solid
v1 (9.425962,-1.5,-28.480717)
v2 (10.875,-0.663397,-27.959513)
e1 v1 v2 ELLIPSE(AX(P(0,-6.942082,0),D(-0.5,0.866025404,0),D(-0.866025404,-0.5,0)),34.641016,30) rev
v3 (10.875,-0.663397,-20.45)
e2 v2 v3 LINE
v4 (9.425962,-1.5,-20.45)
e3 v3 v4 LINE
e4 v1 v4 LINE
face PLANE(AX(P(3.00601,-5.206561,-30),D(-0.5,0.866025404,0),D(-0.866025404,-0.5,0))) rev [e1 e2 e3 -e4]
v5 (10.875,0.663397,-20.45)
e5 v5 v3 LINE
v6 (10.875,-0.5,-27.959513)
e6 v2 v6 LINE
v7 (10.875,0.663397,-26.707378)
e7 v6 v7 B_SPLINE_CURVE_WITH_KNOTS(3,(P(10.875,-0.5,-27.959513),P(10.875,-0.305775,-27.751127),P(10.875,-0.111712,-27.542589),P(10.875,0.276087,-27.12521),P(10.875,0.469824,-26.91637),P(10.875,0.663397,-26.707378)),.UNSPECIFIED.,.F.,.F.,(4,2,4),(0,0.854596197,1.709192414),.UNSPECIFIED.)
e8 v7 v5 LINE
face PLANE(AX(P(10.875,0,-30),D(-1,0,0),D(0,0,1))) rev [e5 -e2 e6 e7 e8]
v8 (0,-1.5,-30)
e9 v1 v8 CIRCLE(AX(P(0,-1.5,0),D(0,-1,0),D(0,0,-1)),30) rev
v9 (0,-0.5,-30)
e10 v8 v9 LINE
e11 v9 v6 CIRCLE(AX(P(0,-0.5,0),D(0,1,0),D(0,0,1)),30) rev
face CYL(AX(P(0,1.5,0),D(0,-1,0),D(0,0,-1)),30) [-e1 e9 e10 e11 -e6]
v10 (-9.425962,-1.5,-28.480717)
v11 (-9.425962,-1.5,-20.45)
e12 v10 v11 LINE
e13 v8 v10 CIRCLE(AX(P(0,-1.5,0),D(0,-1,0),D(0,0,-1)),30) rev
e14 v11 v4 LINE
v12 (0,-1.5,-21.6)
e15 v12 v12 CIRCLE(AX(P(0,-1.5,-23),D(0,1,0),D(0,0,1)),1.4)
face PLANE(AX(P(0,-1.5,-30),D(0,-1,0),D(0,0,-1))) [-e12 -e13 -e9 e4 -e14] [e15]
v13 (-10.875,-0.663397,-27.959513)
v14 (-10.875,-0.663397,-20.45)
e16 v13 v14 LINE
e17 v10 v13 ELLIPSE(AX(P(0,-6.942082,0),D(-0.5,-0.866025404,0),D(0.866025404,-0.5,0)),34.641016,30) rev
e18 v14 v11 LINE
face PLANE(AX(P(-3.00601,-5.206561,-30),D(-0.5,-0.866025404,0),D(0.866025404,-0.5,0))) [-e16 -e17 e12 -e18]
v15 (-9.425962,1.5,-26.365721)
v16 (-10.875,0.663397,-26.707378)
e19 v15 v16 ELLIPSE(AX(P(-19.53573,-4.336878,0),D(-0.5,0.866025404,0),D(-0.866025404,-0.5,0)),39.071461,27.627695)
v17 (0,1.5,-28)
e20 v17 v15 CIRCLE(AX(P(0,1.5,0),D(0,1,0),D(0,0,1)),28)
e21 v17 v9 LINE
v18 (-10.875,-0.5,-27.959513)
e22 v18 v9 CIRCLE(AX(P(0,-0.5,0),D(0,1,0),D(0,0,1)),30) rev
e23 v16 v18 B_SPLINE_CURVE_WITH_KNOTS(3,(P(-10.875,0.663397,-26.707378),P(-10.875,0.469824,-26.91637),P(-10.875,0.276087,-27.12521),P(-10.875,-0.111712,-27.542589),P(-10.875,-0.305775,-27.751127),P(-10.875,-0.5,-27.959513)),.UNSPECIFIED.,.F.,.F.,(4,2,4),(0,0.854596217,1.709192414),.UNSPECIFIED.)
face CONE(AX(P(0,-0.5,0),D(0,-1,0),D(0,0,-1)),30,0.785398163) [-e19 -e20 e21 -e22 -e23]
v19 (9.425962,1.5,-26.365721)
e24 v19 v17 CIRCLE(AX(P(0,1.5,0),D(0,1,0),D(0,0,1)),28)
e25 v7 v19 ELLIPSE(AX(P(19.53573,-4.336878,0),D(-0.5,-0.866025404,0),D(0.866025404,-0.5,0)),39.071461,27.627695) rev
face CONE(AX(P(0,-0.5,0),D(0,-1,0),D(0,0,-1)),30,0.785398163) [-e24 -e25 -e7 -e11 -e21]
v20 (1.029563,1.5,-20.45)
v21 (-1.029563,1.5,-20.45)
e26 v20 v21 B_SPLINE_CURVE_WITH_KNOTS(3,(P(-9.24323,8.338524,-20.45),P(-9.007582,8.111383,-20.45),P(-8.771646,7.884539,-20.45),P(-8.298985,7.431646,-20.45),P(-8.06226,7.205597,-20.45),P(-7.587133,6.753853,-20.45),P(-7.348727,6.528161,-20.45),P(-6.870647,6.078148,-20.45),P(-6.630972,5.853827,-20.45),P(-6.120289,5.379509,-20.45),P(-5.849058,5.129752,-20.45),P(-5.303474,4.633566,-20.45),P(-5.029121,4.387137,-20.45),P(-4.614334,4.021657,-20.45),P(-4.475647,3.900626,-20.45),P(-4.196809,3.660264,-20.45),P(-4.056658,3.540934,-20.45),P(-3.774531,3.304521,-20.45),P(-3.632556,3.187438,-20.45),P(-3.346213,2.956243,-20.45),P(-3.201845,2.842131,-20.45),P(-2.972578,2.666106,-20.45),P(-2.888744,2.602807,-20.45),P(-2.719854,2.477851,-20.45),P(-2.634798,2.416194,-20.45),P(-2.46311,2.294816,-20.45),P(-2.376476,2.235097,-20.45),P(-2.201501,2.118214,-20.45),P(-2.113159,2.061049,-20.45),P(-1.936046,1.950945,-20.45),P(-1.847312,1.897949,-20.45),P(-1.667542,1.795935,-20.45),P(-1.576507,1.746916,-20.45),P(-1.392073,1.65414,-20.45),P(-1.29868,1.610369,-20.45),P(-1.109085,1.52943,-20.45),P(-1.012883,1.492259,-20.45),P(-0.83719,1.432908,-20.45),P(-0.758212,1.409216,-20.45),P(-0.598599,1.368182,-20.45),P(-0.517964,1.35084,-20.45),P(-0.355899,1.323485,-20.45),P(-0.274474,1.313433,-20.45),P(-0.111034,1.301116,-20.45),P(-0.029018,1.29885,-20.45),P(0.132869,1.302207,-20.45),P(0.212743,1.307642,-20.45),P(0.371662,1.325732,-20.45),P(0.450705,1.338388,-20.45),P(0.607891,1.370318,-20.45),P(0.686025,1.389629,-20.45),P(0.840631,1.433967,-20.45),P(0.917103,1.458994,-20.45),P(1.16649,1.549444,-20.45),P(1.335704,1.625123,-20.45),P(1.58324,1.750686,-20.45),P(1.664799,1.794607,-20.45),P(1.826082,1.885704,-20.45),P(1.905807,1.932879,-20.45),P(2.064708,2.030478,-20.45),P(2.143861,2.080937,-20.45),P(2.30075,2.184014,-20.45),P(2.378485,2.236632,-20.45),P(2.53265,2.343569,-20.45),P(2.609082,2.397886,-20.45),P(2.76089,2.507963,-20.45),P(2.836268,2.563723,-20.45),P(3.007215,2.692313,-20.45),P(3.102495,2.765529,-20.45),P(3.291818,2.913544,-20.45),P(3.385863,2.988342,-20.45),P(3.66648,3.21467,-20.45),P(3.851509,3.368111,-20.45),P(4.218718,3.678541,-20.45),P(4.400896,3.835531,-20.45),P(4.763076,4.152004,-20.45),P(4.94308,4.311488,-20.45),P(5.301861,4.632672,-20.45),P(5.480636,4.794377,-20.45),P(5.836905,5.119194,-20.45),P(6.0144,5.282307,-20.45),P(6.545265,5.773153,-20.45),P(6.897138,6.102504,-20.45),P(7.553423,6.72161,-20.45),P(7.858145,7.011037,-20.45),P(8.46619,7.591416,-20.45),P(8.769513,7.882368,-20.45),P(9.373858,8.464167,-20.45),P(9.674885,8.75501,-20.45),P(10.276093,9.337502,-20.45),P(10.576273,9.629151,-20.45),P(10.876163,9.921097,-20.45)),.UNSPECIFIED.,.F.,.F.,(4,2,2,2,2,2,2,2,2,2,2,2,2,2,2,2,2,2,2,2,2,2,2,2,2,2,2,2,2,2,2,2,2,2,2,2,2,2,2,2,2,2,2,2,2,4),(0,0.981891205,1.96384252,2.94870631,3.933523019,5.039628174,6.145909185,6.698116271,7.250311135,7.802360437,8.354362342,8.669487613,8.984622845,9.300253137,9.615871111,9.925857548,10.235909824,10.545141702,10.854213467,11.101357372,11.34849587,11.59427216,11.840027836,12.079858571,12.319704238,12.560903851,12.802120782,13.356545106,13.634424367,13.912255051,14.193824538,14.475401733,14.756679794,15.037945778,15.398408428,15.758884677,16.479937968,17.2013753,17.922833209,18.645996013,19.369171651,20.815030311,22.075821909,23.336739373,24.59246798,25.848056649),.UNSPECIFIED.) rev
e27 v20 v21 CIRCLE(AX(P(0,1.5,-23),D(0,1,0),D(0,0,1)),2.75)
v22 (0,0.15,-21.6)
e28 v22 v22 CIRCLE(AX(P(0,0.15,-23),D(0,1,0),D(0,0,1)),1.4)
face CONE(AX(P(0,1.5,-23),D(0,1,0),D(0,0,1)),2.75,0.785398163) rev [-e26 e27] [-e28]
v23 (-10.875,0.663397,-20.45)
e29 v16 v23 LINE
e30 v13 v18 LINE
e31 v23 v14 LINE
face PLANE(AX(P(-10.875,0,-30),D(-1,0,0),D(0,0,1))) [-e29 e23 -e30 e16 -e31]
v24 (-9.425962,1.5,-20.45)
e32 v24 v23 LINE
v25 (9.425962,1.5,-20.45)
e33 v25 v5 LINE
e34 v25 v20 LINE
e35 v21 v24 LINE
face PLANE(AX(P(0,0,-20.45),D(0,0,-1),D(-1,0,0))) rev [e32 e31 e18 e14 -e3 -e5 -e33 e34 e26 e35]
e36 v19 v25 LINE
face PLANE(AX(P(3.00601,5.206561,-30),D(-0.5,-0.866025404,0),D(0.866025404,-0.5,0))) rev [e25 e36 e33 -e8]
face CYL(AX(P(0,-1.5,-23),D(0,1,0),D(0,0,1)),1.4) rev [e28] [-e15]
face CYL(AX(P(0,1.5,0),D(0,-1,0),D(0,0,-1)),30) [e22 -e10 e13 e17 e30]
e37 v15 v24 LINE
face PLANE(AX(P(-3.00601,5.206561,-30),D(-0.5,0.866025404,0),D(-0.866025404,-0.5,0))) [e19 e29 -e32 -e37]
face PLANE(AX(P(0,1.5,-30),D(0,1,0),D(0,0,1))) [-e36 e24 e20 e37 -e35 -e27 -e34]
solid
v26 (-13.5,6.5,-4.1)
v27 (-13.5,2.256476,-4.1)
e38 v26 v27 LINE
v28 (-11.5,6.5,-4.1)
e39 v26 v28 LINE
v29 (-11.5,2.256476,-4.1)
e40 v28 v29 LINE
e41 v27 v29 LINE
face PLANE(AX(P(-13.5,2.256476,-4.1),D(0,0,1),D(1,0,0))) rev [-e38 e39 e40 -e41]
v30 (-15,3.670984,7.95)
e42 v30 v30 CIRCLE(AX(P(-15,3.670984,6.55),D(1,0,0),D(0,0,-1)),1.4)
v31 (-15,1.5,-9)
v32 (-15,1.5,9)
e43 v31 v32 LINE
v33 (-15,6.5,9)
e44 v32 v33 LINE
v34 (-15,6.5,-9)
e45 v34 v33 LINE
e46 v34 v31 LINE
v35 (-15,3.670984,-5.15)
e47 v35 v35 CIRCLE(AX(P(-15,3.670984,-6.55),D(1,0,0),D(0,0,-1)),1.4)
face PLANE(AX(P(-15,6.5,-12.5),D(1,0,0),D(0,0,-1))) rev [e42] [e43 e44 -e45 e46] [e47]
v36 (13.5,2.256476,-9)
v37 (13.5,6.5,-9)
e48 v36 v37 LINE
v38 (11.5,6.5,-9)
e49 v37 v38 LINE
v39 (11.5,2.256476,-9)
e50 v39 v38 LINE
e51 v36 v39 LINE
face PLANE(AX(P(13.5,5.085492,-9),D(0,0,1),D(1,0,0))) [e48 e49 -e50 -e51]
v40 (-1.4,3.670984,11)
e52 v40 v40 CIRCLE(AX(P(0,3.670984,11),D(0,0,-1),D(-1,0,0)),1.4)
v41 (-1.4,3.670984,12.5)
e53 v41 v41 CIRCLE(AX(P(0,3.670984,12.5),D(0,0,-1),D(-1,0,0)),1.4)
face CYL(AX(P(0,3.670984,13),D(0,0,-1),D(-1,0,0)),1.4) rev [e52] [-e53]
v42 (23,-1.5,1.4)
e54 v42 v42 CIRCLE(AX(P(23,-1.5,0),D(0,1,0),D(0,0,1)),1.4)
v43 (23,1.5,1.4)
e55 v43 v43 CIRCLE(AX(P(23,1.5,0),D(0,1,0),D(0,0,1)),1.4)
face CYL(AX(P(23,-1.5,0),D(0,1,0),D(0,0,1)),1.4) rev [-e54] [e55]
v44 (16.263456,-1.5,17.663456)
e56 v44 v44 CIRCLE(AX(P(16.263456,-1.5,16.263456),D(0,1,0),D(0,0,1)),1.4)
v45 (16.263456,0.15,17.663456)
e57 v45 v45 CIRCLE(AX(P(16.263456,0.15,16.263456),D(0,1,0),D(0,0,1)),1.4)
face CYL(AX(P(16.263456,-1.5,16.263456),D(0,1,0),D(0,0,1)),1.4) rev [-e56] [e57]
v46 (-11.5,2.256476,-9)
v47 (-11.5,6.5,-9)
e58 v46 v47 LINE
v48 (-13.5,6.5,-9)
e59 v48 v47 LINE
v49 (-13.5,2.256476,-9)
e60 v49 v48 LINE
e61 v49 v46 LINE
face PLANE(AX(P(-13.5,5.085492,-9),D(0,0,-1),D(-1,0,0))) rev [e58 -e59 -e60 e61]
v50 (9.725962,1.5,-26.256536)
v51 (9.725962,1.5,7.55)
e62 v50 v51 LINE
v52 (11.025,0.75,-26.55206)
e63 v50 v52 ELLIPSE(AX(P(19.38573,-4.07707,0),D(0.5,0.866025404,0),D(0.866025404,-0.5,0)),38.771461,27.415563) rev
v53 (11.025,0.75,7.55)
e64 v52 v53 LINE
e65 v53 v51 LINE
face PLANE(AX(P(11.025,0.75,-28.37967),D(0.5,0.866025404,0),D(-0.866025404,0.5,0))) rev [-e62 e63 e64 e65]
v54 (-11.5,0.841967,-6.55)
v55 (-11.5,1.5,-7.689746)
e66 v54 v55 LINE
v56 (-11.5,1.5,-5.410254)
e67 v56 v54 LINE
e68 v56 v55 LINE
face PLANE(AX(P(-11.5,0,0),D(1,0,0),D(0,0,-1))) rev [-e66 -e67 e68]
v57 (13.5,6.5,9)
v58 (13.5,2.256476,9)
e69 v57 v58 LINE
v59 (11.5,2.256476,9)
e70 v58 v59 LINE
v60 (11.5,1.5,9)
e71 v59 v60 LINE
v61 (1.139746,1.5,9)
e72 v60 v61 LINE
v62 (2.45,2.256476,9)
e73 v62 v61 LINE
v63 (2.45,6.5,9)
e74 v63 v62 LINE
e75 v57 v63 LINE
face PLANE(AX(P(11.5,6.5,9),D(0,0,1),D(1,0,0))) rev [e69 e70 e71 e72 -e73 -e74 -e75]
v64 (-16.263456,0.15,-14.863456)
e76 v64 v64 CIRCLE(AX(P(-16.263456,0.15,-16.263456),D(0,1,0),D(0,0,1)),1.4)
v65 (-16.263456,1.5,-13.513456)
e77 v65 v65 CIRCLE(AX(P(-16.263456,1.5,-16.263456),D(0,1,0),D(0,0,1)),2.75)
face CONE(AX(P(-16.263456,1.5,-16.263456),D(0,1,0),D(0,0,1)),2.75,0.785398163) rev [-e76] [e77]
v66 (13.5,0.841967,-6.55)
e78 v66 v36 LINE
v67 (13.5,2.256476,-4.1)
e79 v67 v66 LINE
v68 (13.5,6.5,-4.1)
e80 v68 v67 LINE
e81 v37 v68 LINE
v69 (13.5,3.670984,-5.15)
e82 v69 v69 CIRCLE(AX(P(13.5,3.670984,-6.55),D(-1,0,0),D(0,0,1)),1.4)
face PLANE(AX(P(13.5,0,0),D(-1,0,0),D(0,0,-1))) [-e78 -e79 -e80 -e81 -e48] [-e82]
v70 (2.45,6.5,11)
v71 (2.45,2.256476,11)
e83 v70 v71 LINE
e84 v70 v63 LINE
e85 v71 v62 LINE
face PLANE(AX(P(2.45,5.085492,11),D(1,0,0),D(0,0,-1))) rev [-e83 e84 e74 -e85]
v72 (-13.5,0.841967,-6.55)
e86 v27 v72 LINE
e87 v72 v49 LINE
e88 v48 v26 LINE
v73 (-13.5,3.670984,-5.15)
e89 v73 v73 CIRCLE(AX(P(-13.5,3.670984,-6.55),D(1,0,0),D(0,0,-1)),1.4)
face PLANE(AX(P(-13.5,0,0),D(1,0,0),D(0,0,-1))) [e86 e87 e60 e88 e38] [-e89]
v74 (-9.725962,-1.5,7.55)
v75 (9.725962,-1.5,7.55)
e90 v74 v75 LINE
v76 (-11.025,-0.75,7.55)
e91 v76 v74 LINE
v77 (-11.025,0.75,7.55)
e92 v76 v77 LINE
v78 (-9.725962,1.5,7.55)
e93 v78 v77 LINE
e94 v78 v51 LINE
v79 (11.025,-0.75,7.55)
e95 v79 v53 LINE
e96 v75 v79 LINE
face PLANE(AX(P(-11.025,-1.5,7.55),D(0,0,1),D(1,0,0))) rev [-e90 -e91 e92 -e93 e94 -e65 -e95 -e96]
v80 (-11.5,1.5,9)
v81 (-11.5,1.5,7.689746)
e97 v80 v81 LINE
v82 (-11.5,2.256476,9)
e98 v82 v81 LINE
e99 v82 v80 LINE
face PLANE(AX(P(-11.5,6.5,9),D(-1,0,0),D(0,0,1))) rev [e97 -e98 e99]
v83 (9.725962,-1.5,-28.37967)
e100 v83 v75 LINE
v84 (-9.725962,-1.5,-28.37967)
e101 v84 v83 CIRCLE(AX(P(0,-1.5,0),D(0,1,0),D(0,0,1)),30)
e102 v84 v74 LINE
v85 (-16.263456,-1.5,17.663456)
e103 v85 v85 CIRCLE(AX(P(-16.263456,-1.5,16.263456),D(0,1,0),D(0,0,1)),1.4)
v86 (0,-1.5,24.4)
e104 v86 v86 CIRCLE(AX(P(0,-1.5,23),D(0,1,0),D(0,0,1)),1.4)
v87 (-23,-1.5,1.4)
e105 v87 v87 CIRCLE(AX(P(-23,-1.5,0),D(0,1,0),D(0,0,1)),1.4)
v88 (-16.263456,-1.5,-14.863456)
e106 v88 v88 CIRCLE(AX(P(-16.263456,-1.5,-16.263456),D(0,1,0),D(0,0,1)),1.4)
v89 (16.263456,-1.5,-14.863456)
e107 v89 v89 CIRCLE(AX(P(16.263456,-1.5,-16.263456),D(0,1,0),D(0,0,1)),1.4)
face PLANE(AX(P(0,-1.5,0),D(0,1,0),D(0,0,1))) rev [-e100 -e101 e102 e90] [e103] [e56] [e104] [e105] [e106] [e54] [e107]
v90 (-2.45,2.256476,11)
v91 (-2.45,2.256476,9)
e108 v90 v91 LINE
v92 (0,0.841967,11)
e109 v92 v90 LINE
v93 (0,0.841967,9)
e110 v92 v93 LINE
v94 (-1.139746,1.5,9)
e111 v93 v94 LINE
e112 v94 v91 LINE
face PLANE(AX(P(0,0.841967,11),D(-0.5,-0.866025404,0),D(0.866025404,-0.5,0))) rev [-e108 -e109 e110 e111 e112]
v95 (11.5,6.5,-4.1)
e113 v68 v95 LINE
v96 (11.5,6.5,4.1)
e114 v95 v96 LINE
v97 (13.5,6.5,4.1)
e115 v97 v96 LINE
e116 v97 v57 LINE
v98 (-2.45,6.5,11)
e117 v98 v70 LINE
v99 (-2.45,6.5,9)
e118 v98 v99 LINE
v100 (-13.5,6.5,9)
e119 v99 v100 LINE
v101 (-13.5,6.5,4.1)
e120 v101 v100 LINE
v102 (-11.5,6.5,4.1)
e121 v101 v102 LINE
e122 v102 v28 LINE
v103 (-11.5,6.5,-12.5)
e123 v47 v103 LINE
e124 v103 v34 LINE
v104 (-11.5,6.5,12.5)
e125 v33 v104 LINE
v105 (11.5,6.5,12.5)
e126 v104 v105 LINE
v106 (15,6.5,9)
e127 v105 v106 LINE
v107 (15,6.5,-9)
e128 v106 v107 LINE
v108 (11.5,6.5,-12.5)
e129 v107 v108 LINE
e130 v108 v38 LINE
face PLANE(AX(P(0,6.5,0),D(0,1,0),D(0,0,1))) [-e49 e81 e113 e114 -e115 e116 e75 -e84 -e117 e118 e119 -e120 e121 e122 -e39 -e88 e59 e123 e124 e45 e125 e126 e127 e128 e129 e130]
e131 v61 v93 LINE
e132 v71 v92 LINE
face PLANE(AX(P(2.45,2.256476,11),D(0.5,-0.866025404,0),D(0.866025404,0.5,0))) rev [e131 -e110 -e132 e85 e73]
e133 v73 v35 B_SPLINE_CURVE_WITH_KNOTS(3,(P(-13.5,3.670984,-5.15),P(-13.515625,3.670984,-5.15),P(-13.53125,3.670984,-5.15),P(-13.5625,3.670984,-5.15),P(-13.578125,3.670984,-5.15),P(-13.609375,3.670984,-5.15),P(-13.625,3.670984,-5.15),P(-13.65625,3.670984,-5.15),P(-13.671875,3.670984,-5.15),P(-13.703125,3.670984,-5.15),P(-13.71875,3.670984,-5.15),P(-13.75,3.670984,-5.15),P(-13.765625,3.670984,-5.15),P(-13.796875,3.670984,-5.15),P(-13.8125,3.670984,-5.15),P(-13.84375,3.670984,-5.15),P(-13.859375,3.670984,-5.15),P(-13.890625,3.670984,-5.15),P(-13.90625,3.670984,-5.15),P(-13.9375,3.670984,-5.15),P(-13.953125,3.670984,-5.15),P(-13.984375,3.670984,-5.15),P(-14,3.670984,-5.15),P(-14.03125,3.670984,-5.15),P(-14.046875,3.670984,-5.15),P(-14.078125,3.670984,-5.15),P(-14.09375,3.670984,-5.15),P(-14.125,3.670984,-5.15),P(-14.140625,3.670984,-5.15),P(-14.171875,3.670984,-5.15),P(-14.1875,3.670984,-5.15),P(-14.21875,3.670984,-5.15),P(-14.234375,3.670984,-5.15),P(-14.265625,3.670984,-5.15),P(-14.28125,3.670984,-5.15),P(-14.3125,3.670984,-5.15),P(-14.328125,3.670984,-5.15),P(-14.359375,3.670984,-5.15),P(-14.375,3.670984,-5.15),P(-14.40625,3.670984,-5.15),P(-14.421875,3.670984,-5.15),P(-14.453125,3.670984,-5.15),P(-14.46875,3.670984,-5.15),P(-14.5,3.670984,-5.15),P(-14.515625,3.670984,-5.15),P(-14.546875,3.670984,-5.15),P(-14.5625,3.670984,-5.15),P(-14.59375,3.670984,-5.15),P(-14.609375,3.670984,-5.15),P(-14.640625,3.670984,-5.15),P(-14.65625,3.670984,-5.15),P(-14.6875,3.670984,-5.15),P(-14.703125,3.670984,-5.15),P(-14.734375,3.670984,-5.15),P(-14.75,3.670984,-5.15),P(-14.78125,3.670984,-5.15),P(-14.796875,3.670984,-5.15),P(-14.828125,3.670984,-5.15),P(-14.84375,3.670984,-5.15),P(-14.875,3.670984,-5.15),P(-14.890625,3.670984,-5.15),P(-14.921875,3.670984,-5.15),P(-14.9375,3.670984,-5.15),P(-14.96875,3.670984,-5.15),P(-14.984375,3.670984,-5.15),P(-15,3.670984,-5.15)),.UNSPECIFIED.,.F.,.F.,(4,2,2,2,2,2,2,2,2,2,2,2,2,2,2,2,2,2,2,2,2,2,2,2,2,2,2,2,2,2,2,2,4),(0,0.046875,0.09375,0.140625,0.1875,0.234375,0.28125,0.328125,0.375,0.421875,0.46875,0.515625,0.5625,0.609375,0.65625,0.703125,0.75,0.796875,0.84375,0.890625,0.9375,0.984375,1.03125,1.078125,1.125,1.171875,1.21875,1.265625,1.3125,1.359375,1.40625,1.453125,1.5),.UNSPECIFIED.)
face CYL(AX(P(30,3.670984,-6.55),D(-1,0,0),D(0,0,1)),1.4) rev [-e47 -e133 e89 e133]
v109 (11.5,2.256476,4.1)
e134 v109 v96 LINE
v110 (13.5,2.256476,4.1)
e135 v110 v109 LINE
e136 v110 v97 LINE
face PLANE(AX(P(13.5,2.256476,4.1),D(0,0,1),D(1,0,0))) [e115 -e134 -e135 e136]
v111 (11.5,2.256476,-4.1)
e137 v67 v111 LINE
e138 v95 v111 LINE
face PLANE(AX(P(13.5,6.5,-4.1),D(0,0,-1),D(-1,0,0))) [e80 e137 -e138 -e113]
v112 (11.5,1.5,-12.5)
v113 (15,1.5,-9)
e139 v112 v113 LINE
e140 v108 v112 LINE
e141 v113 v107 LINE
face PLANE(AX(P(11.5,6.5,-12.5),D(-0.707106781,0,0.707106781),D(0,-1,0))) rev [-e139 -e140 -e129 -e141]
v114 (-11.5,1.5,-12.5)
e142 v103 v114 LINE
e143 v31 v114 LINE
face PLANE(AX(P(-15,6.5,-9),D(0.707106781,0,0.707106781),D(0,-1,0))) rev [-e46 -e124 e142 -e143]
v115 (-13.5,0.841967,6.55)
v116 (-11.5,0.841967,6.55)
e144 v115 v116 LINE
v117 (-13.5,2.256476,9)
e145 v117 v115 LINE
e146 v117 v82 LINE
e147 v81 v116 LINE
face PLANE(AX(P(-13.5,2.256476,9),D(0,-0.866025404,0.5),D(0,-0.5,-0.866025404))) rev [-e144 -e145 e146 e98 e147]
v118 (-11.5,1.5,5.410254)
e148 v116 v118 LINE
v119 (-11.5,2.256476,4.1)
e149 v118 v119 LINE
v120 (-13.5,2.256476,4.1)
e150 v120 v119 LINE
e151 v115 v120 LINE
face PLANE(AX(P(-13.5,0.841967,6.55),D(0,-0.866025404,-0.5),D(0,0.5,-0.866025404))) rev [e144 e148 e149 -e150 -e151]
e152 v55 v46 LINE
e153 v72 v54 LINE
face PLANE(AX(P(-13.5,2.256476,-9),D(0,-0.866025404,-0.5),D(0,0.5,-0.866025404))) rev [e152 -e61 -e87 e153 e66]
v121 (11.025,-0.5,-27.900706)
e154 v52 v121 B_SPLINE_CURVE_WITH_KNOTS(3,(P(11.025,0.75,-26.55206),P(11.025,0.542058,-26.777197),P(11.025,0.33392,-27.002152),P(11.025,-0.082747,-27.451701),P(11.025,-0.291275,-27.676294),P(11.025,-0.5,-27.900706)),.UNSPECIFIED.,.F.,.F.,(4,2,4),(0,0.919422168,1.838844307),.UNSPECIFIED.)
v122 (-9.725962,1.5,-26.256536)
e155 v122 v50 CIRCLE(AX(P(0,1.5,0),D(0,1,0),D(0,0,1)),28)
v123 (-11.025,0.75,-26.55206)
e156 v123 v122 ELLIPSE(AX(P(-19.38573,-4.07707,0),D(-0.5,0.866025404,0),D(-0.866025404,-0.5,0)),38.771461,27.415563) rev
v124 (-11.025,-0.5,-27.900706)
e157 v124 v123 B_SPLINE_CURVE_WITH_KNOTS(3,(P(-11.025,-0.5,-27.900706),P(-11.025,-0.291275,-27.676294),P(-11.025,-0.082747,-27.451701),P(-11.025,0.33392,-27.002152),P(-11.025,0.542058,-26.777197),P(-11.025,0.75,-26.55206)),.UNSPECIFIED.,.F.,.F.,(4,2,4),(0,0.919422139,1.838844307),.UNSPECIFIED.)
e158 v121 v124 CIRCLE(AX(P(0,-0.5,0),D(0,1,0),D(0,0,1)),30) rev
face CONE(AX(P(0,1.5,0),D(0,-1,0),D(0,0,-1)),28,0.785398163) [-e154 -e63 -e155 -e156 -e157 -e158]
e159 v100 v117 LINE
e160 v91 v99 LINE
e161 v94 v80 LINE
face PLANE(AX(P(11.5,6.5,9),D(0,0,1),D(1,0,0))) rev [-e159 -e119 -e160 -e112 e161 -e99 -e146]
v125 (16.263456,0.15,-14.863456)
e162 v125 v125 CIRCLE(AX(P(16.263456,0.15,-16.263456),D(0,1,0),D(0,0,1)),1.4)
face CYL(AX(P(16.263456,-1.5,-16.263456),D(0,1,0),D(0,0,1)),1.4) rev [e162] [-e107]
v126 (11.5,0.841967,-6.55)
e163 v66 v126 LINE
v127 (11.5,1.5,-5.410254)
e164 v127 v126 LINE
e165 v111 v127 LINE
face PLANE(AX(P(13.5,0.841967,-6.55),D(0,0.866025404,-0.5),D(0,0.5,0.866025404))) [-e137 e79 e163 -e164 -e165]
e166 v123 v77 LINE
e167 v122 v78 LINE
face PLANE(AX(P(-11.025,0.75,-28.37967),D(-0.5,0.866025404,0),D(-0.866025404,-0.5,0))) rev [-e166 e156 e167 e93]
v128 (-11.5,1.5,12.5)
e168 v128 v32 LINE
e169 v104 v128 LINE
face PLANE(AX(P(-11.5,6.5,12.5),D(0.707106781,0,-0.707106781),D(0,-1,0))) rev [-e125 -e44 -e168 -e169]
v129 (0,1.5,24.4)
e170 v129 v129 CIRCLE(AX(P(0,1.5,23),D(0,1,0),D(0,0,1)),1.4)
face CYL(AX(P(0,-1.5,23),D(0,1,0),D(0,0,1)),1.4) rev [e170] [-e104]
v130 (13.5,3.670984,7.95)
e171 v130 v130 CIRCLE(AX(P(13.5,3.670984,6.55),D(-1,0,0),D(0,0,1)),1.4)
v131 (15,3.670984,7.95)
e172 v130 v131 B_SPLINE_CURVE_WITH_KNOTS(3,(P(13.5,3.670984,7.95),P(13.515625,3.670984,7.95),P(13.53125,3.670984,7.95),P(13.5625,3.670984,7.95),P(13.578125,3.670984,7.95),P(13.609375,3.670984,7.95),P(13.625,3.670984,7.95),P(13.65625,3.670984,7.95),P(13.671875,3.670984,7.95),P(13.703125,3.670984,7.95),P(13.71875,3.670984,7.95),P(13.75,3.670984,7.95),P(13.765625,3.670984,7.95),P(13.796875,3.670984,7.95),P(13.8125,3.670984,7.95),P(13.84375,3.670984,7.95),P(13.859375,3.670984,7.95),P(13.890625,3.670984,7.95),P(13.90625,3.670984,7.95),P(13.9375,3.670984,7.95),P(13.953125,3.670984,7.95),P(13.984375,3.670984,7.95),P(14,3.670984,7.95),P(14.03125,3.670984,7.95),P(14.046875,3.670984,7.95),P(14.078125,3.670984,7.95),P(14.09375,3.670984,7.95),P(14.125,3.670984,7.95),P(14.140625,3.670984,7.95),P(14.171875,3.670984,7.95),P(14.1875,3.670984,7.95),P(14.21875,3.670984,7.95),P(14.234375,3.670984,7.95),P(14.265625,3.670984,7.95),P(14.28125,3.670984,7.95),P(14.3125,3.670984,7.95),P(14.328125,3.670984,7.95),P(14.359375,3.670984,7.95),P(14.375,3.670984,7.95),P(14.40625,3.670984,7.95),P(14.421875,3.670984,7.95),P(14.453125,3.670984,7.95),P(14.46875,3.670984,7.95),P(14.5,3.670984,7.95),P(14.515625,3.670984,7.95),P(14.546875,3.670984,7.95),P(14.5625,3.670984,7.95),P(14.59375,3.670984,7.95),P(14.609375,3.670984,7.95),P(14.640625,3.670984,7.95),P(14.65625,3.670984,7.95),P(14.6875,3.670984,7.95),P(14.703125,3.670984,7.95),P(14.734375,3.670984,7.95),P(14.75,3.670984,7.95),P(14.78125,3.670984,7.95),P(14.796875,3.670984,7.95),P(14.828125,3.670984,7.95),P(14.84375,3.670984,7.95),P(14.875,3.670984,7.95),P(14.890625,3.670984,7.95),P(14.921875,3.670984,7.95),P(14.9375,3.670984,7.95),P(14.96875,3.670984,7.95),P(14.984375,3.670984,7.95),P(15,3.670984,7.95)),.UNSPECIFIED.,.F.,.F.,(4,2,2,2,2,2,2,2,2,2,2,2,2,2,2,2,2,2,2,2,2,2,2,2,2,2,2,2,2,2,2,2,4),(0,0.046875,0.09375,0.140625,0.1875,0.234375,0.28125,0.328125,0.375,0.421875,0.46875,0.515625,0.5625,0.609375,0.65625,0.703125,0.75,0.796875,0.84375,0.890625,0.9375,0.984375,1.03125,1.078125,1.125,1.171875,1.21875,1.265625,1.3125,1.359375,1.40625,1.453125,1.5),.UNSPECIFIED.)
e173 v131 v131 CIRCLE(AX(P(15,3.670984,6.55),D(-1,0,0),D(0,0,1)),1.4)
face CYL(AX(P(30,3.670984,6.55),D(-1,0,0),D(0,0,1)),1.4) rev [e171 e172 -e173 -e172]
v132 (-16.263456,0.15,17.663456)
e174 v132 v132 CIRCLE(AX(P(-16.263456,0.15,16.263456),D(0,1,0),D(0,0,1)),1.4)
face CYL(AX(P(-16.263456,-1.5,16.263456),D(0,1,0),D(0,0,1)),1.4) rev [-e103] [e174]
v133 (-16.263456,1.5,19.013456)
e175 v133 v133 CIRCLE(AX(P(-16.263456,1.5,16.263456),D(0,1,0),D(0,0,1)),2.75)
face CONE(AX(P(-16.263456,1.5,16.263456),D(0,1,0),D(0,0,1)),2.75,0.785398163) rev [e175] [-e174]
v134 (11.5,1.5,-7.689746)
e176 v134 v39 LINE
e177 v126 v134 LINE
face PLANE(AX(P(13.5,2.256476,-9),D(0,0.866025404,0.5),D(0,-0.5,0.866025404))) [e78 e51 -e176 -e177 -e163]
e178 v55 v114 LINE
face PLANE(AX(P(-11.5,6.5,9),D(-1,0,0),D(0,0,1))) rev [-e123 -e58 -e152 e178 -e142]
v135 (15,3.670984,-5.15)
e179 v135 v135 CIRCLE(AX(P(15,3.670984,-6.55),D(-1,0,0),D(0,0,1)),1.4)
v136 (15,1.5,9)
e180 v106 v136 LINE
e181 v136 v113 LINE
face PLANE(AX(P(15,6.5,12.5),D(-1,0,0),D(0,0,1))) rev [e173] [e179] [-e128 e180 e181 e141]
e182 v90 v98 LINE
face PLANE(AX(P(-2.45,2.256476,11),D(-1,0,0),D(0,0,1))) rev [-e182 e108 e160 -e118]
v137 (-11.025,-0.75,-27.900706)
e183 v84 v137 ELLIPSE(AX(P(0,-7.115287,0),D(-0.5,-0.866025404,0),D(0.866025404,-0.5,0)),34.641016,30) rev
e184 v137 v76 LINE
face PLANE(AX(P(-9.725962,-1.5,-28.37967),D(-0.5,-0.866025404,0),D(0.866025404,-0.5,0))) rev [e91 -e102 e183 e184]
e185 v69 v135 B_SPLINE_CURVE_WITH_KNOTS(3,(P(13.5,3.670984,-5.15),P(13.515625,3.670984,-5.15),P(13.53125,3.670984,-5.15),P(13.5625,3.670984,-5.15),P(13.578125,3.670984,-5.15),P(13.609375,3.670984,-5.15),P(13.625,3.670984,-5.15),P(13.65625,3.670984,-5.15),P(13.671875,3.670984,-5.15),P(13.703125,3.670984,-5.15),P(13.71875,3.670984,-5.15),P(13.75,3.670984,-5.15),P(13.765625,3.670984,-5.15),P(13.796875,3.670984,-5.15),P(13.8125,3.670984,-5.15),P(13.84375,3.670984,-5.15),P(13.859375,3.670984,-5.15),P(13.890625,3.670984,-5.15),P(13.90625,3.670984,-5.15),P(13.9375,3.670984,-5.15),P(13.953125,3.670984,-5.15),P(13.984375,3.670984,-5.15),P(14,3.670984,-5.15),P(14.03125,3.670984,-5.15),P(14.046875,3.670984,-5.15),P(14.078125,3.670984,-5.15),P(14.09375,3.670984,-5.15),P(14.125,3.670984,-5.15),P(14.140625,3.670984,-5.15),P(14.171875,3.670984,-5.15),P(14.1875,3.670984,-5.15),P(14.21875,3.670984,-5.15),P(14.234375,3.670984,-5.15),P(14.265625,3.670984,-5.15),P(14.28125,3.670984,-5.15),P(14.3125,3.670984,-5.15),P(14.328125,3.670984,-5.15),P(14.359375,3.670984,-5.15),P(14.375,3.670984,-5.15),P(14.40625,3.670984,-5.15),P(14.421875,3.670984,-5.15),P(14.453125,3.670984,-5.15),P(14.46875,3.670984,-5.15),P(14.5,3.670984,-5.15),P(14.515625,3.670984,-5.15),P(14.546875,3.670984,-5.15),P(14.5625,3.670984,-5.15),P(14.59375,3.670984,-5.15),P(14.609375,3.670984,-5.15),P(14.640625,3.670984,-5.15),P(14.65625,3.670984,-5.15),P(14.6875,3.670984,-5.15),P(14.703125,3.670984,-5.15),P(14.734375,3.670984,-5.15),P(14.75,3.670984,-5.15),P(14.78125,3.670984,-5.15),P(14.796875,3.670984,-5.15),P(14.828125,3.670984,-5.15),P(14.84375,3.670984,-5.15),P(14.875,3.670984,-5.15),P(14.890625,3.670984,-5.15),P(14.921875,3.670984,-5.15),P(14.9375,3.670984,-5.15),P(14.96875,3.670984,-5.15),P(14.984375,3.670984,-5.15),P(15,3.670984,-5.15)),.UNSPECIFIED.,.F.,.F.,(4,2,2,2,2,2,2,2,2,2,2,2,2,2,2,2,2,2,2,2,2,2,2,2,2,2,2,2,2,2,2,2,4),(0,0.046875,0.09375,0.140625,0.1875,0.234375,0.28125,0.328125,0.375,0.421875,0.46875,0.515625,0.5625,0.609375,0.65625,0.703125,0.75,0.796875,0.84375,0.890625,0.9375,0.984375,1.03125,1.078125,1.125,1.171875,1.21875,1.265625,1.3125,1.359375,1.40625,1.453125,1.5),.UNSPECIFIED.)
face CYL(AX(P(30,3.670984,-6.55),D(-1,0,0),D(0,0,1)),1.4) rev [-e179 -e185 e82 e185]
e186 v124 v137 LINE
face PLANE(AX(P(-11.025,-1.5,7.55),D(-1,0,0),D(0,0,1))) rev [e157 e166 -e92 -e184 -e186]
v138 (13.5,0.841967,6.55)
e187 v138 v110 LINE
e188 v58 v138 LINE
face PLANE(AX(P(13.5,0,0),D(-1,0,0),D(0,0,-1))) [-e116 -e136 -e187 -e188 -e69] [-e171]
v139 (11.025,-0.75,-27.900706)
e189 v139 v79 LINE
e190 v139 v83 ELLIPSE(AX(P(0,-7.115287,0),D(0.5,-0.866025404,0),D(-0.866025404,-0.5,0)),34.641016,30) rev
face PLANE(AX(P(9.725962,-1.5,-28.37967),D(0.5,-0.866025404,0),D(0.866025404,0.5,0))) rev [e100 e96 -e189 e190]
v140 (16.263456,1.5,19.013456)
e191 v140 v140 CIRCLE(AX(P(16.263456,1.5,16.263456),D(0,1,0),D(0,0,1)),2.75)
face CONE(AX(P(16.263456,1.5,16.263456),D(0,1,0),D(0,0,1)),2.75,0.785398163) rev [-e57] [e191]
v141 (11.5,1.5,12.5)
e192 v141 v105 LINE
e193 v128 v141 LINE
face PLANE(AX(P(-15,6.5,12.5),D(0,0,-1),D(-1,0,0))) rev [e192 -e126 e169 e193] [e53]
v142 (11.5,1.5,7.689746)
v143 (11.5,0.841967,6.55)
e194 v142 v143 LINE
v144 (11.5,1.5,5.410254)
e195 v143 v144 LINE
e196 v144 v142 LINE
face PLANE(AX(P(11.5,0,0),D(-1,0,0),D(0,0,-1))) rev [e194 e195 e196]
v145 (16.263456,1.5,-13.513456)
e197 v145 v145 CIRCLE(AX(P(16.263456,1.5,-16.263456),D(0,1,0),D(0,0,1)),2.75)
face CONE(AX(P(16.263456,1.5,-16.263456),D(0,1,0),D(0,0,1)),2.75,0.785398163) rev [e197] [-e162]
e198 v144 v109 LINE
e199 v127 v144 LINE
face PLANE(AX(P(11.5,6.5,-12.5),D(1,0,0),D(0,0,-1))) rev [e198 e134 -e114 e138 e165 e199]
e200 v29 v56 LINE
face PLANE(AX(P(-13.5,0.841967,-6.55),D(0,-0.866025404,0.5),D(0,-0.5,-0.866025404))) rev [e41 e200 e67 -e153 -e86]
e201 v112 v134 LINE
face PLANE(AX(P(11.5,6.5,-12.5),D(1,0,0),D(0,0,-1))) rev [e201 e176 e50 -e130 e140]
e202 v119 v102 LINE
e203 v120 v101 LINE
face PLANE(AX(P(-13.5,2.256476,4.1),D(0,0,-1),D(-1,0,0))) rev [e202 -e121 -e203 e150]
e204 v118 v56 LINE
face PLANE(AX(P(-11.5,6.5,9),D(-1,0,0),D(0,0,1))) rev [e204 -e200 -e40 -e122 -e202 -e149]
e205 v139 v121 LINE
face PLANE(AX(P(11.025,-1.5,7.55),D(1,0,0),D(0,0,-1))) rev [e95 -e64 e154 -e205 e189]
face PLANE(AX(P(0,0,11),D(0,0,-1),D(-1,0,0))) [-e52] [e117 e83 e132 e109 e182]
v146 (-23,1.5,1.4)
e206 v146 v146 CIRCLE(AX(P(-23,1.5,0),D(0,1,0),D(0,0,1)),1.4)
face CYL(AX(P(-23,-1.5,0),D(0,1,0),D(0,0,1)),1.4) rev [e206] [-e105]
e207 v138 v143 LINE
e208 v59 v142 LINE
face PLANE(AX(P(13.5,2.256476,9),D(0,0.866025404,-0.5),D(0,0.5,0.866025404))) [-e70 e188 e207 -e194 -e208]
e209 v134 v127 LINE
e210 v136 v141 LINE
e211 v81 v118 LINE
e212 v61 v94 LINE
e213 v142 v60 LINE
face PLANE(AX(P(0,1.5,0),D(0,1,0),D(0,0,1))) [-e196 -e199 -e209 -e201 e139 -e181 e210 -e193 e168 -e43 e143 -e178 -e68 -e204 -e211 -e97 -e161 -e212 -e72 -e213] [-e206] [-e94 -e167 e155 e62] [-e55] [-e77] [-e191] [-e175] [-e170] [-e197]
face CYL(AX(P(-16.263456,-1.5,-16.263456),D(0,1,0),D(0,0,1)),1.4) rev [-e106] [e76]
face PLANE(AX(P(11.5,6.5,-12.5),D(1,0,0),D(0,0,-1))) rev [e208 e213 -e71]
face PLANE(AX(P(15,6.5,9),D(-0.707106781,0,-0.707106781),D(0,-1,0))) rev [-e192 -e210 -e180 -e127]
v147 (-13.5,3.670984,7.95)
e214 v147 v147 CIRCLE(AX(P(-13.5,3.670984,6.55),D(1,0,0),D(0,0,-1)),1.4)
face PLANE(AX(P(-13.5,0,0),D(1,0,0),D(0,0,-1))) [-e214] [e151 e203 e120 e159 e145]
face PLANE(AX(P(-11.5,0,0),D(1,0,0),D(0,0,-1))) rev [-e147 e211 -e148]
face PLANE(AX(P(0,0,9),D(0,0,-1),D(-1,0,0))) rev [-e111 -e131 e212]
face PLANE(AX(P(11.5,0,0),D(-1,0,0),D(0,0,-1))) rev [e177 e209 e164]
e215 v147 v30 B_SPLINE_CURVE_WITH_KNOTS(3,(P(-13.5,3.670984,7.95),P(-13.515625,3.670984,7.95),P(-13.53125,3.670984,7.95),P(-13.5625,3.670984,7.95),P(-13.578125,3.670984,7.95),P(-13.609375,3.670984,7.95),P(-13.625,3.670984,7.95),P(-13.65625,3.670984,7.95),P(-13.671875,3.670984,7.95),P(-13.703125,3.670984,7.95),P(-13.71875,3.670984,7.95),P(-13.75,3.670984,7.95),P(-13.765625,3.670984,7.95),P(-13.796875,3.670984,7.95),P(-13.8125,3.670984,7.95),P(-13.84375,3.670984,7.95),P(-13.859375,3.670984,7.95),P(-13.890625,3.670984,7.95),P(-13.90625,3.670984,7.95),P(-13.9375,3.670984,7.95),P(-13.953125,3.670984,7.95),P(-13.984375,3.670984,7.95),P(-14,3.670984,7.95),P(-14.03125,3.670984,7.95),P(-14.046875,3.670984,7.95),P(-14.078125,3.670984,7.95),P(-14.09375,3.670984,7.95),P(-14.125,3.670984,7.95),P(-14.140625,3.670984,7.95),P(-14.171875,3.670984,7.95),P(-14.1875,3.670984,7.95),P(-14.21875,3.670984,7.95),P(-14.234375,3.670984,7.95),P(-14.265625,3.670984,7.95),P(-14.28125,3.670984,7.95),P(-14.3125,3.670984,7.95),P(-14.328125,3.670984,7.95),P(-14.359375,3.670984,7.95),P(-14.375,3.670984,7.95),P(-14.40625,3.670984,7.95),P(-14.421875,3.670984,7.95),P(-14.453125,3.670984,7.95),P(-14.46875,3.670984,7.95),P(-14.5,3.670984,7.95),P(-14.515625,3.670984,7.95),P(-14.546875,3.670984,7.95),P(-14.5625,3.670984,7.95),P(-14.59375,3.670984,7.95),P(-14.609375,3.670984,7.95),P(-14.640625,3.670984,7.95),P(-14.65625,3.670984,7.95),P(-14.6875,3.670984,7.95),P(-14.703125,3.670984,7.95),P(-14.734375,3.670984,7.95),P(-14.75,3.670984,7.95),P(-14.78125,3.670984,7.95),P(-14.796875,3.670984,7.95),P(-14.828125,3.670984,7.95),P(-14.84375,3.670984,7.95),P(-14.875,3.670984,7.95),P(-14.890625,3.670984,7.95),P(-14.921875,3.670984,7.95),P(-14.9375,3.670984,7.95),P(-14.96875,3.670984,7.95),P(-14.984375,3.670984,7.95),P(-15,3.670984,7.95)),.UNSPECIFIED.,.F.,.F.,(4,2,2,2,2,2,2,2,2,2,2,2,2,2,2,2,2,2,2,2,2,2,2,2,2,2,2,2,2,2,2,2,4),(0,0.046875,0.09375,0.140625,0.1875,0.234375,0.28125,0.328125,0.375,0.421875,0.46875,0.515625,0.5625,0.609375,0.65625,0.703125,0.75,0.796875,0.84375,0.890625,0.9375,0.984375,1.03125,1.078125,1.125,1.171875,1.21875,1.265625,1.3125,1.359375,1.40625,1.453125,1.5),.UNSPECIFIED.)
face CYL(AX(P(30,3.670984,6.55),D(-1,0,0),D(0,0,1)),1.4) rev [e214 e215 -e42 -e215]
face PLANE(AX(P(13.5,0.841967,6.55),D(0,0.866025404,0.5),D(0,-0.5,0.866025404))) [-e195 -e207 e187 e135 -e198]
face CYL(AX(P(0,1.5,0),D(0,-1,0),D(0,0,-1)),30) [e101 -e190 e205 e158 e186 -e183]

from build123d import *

# Parameters (mm, degrees)
SKETCH1_R                                      = 30
BOSS_EXTRUDE1_DEPTH                            = 1.5
CUT_EXTRUDE1_DEPTH                             = 43.532340636
BOSS_EXTRUDE2_REACH                            = 48.465
BOSS_EXTRUDE2_END_RADIUS                       = 30
CHAMFER1_SIZE                                  = 2
BOSS_EXTRUDE3_REACH                            = 60.715
BOSS_EXTRUDE3_END_RADIUS                       = 30
CHAMFER2_SIZE                                  = 2
SKETCH5_R                                      = 1.4
CUT_EXTRUDE2_DEPTH                             = 43.532340636
CSK_FOR_M2_5_FLAT_HEAD_MACHINE_SCREW1_AT_COUNT = 2
CSK_FOR_M2_5_FLAT_HEAD_MACHINE_SCREW1_AT_PITCH = 32.526911935
CSK_FOR_M2_5_FLAT_HEAD_MACHINE_SCREW_2_COUNT   = 2
CSK_FOR_M2_5_FLAT_HEAD_MACHINE_SCREW_2_PITCH   = 32.526911935
CSK_FOR_M2_5_FLAT_HEAD_MACHINE_SCREW_3_COUNT   = 2
CSK_FOR_M2_5_FLAT_HEAD_MACHINE_SCREW_3_PITCH   = 46
CSK_FOR_M2_5_FLAT_HEAD_MACHINE_SCREW_4_COUNT   = 2
CSK_FOR_M2_5_FLAT_HEAD_MACHINE_SCREW_4_PITCH   = 42.498458496
BOSS_EXTRUDE4_DEPTH                            = 5
CUT_EXTRUDE3_DEPTH                             = 2
CHAMFER3_SIZE                                  = 3.5
CUT_EXTRUDE4_DEPTH                             = 2
SKETCH13_R                                     = 1.4
CUT_EXTRUDE5_DEPTH                             = 2
CUT_EXTRUDE6_DEPTH                             = 55.472470111
CUT_EXTRUDE6_DEPTH_BACK                        = 55.472470111
SKETCH14_R                                     = 1.4


# Some blends are built 0.0001 mm under size
with BuildPart() as part:
    # Sketch1 → Boss-Extrude1 (new, symmetric)
    with BuildSketch(Plane(origin=(0, 0, 0), x_dir=(1, 0, 0), z_dir=(0, 1, 0))):
        with Locations(Location((0, 0, 0), (0, 0, 270))):
            Circle(SKETCH1_R)
    extrude(amount=BOSS_EXTRUDE1_DEPTH, both=True)

    # Sketch2 → Cut-Extrude1 (cut, through all)
    with BuildSketch(Plane(origin=(0, 1.5, 0), x_dir=(1, 0, 0), z_dir=(0, 1, 0))):
        Polygon((-11.025, 7.55), (-11.025, 30), (11.025, 30), (11.025, 7.55), (11.025, -7.55), (-11.025, -7.55), align=None)
    extrude(amount=-CUT_EXTRUDE1_DEPTH, mode=Mode.SUBTRACT)

    # Boss-Extrude2: up to this cylinder (the profile starts inside it)
    boss_extrude2_end = Plane(origin=(0, -0.7325095, 0), z_dir=(0, -1, 0)) * Cylinder(BOSS_EXTRUDE2_END_RADIUS, 159.395019, mode=Mode.PRIVATE)
    # Sketch3 → Boss-Extrude2 (add, up to the surface)
    with BuildSketch(Plane(origin=(0, 0, 7.55), x_dir=(-1, 0, 0), z_dir=(0, 0, -1)), mode=Mode.PRIVATE) as boss_extrude2_sk1:
        Polygon((-11.525, -1.5), (-9.725961894, -1.5), (-11.025, -0.75), (-11.025, 0.75), (-9.725961894, 1.5), (-11.525, 1.5), align=None)
    boss_extrude2_tool1 = extrude(boss_extrude2_sk1.sketch, amount=BOSS_EXTRUDE2_REACH, mode=Mode.PRIVATE) & boss_extrude2_end
    add(boss_extrude2_tool1.solids().sort_by_distance((10.625481, -1.465019, 7.55))[0])
    # Sketch3 → Boss-Extrude2 (add, up to the surface)
    with BuildSketch(Plane(origin=(0, 0, 7.55), x_dir=(-1, 0, 0), z_dir=(0, 0, -1)), mode=Mode.PRIVATE) as boss_extrude2_sk2:
        Polygon((11.525, 1.5), (11.525, -1.5), (9.725961894, -1.5), (11.025, -0.75), (11.025, 0.75), (9.725961894, 1.5), align=None)
    boss_extrude2_tool2 = extrude(boss_extrude2_sk2.sketch, amount=BOSS_EXTRUDE2_REACH, mode=Mode.PRIVATE) & boss_extrude2_end
    add(boss_extrude2_tool2.solids().sort_by_distance((-11.490019, 0, 7.55))[0])

    # Chamfer1
    chamfer1_edges = [part.edges().sort_by_distance(p)[0] for p in [
        (0, 1.5, 30),
    ]]
    chamfer(chamfer1_edges, length=CHAMFER1_SIZE)


with BuildPart() as body_2:
    # Boss-Extrude3: up to this cylinder (the profile starts inside it)
    boss_extrude3_end = Plane(origin=(0, 0, 0), z_dir=(0, -1, 0)) * Cylinder(BOSS_EXTRUDE3_END_RADIUS, 182.43, mode=Mode.PRIVATE)
    # Sketch6 → Boss-Extrude3 (new, up to the surface)
    with BuildSketch(Plane(origin=(0, 0, -20.45), x_dir=(-1, 0, 0), z_dir=(0, 0, -1)), mode=Mode.PRIVATE) as boss_extrude3_sk1:
        Polygon((9.425961894, -1.5), (-9.425961894, -1.5), (-10.875, -0.66339746), (-10.875, 0.66339746), (-9.425961894, 1.5), (9.425961894, 1.5), (10.875, 0.66339746), (10.875, -0.66339746), align=None)
    boss_extrude3_tool1 = extrude(boss_extrude3_sk1.sketch, amount=BOSS_EXTRUDE3_REACH, mode=Mode.PRIVATE) & boss_extrude3_end
    add(boss_extrude3_tool1.solids().sort_by_distance((0, 0, -20.45))[0])

    # Chamfer2
    # the kernel refuses this chamfer: 2 mm, written as the material it takes off along each edge
    with BuildSketch(Plane(origin=(0, 1.5, 0), x_dir=(-0.47156923659159816, 0, -0.881829039610523), z_dir=(-0.881829039610523, 0, 0.47156923659159816))) as chamfer2_piece_1:
        Polygon((30 - CHAMFER2_SIZE, 0), (30, CHAMFER2_SIZE), (30, 0), align=None)
    revolve(axis=Axis((0, 1.5, 0), (0, -1, 0)), revolution_arc=56.272414757, mode=Mode.SUBTRACT)


with BuildPart() as cut_extrude2_tool:
    # Sketch5 → Cut-Extrude2 (new, through all)
    with BuildSketch(Plane(origin=(0, 1.5, 0), x_dir=(1, 0, 0), z_dir=(0, 1, 0))):
        with Locations(Location((0, 23, 0), (0, 0, 270))):
            Circle(SKETCH5_R)
        with Locations(Location((16.263455967, 16.263455967, 0), (0, 0, 270))):
            Circle(SKETCH5_R)
        with Locations(Location((23, 0, 0), (0, 0, 270))):
            Circle(SKETCH5_R)
        with Locations(Location((16.263455967, -16.263455967, 0), (0, 0, 270))):
            Circle(SKETCH5_R)
        with Locations(Location((0, -23, 0), (0, 0, 270))):
            Circle(SKETCH5_R)
        with Locations(Location((-16.263455967, -16.263455967, 0), (0, 0, 270))):
            Circle(SKETCH5_R)
        with Locations(Location((-23, 0, 0), (0, 0, 270))):
            Circle(SKETCH5_R)
        with Locations(Location((-16.263455967, 16.263455967, 0), (0, 0, 270))):
            Circle(SKETCH5_R)
    extrude(amount=-CUT_EXTRUDE2_DEPTH)


with BuildPart() as part_1:
    add(part.part)

    # Cut-Extrude2: cut by cut_extrude2_tool
    add(cut_extrude2_tool.part, mode=Mode.SUBTRACT)

    # Sketch8 → CSK for M2.5 Flat Head Machine Screw1 (revolve, cut)
    with BuildSketch(Plane(origin=(-16.263455967, 1.5, 16.263455967), x_dir=(0, 0, 1), z_dir=(1, 0, 0))):
        Polygon((0, 0), (0, 3), (1.35, 3), (1.35, 1.4), (2.75, 0), align=None)
    csk_for_m2_5_flat_head_machine_screw1 = revolve(axis=Axis((-16.263455967, 7.85, 16.263455967), (0, -1, 0)), mode=Mode.SUBTRACT)

    # CSK for M2.5 Flat Head Machine Screw1 at: CSK for M2.5 Flat Head Machine Screw1 ×2
    with Locations(*[(i * CSK_FOR_M2_5_FLAT_HEAD_MACHINE_SCREW1_AT_PITCH, 0, 0) for i in range(1, CSK_FOR_M2_5_FLAT_HEAD_MACHINE_SCREW1_AT_COUNT)]):
        add(csk_for_m2_5_flat_head_machine_screw1, mode=Mode.SUBTRACT)

    # CSK for M2.5 Flat Head Machine Screw 2: CSK for M2.5 Flat Head Machine Screw1 ×2
    with Locations(*[(0, 0, -i * CSK_FOR_M2_5_FLAT_HEAD_MACHINE_SCREW_2_PITCH) for i in range(1, CSK_FOR_M2_5_FLAT_HEAD_MACHINE_SCREW_2_COUNT)]):
        add(csk_for_m2_5_flat_head_machine_screw1, mode=Mode.SUBTRACT)

    # CSK for M2.5 Flat Head Machine Screw 3: CSK for M2.5 Flat Head Machine Screw1 ×2
    with Locations(*[Vector(0.7071067811865626, 0, -0.7071067811865325) * (i * CSK_FOR_M2_5_FLAT_HEAD_MACHINE_SCREW_3_PITCH) for i in range(1, CSK_FOR_M2_5_FLAT_HEAD_MACHINE_SCREW_3_COUNT)]):
        add(csk_for_m2_5_flat_head_machine_screw1, mode=Mode.SUBTRACT)

    # Sketch10 → Boss-Extrude4 (add)
    with BuildSketch(Plane(origin=(0, 1.5, 0), x_dir=(1, 0, 0), z_dir=(0, 1, 0))):
        Polygon((-11.5, -9), (-11.5, 12.5), (-15, 12.5), (-15, -12.5), (15, -12.5), (15, 12.5), (11.5, 12.5), (11.5, -9), align=None)
    extrude(amount=BOSS_EXTRUDE4_DEPTH)

    # Sketch11 → Cut-Extrude3 (cut)
    with BuildSketch(Plane(origin=(0, 0, 9), x_dir=(-1, 0, 0), z_dir=(0, 0, -1))):
        Polygon((-2.45, 5.08549184), (-2.45, 2.256475521), (0, 0.841967362), (2.45, 2.256475521), (2.45, 5.08549184), (2.45, 6.5), (-2.45, 6.5), align=None)
    extrude(amount=-CUT_EXTRUDE3_DEPTH, mode=Mode.SUBTRACT)

    # Chamfer3
    chamfer3_edges = [part_1.edges().sort_by_distance(p)[0] for p in [
        (15, 4, 12.5),
        (-15, 4, 12.5),
        (-15, 4, -12.5),
        (15, 4, -12.5),
    ]]
    chamfer(chamfer3_edges, length=CHAMFER3_SIZE - 0.0001)  # a hair under: the kernel refuses the full size

    # Sketch12 → Cut-Extrude4 (cut)
    with BuildSketch(Plane(origin=(-11.5, 0, 0), x_dir=(0, 0, -1), z_dir=(1, 0, 0))):
        Polygon((-9, 5.08549184), (-9, 6.5), (-4.1, 6.5), (-4.1, 5.08549184), (-4.1, 2.256475521), (-6.55, 0.841967362), (-9, 2.256475521), align=None)
        Polygon((9, 6.5), (4.1, 6.5), (4.1, 5.08549184), (4.1, 2.256475521), (6.55, 0.841967362), (9, 2.256475521), (9, 5.08549184), align=None)
    cut_extrude4 = extrude(amount=-CUT_EXTRUDE4_DEPTH, mode=Mode.SUBTRACT)

    # Mirror1: Cut-Extrude4 across plane
    add(cut_extrude4.mirror(Plane(origin=(0, 0, 0), x_dir=(0, 0, 1), z_dir=(1, 0, 0))), mode=Mode.SUBTRACT)

    # Sketch13 → Cut-Extrude5 (cut)
    with BuildSketch(Plane(origin=(0, 0, 11), x_dir=(-1, 0, 0), z_dir=(0, 0, -1))):
        with Locations((0, 3.670983681)):
            Circle(SKETCH13_R)
    extrude(amount=-CUT_EXTRUDE5_DEPTH, mode=Mode.SUBTRACT)

    # Sketch14 → Cut-Extrude6 (cut, two sides: drawn at the far end of the back side and taken through both)
    with BuildSketch(Plane.ZY.offset(15).offset(-CUT_EXTRUDE6_DEPTH_BACK)):
        with Locations((6.55, 3.670983681)):
            Circle(SKETCH14_R)
        with Locations((-6.55, 3.670983681)):
            Circle(SKETCH14_R)
    extrude(amount=CUT_EXTRUDE6_DEPTH + CUT_EXTRUDE6_DEPTH_BACK, mode=Mode.SUBTRACT)


with BuildPart() as body_2_1:
    add(body_2.part)

    # Cut-Extrude2: cut by cut_extrude2_tool
    add(cut_extrude2_tool.part, mode=Mode.SUBTRACT)

    # CSK for M2.5 Flat Head Machine Screw 4: CSK for M2.5 Flat Head Machine Screw1 ×2
    with Locations(*[Vector(0.38268343236510954, 0, -0.9238795325112786) * (i * CSK_FOR_M2_5_FLAT_HEAD_MACHINE_SCREW_4_PITCH) for i in range(1, CSK_FOR_M2_5_FLAT_HEAD_MACHINE_SCREW_4_COUNT)]):
        add(csk_for_m2_5_flat_head_machine_screw1, mode=Mode.SUBTRACT)


solid = Compound([part_1.part, body_2_1.part])
